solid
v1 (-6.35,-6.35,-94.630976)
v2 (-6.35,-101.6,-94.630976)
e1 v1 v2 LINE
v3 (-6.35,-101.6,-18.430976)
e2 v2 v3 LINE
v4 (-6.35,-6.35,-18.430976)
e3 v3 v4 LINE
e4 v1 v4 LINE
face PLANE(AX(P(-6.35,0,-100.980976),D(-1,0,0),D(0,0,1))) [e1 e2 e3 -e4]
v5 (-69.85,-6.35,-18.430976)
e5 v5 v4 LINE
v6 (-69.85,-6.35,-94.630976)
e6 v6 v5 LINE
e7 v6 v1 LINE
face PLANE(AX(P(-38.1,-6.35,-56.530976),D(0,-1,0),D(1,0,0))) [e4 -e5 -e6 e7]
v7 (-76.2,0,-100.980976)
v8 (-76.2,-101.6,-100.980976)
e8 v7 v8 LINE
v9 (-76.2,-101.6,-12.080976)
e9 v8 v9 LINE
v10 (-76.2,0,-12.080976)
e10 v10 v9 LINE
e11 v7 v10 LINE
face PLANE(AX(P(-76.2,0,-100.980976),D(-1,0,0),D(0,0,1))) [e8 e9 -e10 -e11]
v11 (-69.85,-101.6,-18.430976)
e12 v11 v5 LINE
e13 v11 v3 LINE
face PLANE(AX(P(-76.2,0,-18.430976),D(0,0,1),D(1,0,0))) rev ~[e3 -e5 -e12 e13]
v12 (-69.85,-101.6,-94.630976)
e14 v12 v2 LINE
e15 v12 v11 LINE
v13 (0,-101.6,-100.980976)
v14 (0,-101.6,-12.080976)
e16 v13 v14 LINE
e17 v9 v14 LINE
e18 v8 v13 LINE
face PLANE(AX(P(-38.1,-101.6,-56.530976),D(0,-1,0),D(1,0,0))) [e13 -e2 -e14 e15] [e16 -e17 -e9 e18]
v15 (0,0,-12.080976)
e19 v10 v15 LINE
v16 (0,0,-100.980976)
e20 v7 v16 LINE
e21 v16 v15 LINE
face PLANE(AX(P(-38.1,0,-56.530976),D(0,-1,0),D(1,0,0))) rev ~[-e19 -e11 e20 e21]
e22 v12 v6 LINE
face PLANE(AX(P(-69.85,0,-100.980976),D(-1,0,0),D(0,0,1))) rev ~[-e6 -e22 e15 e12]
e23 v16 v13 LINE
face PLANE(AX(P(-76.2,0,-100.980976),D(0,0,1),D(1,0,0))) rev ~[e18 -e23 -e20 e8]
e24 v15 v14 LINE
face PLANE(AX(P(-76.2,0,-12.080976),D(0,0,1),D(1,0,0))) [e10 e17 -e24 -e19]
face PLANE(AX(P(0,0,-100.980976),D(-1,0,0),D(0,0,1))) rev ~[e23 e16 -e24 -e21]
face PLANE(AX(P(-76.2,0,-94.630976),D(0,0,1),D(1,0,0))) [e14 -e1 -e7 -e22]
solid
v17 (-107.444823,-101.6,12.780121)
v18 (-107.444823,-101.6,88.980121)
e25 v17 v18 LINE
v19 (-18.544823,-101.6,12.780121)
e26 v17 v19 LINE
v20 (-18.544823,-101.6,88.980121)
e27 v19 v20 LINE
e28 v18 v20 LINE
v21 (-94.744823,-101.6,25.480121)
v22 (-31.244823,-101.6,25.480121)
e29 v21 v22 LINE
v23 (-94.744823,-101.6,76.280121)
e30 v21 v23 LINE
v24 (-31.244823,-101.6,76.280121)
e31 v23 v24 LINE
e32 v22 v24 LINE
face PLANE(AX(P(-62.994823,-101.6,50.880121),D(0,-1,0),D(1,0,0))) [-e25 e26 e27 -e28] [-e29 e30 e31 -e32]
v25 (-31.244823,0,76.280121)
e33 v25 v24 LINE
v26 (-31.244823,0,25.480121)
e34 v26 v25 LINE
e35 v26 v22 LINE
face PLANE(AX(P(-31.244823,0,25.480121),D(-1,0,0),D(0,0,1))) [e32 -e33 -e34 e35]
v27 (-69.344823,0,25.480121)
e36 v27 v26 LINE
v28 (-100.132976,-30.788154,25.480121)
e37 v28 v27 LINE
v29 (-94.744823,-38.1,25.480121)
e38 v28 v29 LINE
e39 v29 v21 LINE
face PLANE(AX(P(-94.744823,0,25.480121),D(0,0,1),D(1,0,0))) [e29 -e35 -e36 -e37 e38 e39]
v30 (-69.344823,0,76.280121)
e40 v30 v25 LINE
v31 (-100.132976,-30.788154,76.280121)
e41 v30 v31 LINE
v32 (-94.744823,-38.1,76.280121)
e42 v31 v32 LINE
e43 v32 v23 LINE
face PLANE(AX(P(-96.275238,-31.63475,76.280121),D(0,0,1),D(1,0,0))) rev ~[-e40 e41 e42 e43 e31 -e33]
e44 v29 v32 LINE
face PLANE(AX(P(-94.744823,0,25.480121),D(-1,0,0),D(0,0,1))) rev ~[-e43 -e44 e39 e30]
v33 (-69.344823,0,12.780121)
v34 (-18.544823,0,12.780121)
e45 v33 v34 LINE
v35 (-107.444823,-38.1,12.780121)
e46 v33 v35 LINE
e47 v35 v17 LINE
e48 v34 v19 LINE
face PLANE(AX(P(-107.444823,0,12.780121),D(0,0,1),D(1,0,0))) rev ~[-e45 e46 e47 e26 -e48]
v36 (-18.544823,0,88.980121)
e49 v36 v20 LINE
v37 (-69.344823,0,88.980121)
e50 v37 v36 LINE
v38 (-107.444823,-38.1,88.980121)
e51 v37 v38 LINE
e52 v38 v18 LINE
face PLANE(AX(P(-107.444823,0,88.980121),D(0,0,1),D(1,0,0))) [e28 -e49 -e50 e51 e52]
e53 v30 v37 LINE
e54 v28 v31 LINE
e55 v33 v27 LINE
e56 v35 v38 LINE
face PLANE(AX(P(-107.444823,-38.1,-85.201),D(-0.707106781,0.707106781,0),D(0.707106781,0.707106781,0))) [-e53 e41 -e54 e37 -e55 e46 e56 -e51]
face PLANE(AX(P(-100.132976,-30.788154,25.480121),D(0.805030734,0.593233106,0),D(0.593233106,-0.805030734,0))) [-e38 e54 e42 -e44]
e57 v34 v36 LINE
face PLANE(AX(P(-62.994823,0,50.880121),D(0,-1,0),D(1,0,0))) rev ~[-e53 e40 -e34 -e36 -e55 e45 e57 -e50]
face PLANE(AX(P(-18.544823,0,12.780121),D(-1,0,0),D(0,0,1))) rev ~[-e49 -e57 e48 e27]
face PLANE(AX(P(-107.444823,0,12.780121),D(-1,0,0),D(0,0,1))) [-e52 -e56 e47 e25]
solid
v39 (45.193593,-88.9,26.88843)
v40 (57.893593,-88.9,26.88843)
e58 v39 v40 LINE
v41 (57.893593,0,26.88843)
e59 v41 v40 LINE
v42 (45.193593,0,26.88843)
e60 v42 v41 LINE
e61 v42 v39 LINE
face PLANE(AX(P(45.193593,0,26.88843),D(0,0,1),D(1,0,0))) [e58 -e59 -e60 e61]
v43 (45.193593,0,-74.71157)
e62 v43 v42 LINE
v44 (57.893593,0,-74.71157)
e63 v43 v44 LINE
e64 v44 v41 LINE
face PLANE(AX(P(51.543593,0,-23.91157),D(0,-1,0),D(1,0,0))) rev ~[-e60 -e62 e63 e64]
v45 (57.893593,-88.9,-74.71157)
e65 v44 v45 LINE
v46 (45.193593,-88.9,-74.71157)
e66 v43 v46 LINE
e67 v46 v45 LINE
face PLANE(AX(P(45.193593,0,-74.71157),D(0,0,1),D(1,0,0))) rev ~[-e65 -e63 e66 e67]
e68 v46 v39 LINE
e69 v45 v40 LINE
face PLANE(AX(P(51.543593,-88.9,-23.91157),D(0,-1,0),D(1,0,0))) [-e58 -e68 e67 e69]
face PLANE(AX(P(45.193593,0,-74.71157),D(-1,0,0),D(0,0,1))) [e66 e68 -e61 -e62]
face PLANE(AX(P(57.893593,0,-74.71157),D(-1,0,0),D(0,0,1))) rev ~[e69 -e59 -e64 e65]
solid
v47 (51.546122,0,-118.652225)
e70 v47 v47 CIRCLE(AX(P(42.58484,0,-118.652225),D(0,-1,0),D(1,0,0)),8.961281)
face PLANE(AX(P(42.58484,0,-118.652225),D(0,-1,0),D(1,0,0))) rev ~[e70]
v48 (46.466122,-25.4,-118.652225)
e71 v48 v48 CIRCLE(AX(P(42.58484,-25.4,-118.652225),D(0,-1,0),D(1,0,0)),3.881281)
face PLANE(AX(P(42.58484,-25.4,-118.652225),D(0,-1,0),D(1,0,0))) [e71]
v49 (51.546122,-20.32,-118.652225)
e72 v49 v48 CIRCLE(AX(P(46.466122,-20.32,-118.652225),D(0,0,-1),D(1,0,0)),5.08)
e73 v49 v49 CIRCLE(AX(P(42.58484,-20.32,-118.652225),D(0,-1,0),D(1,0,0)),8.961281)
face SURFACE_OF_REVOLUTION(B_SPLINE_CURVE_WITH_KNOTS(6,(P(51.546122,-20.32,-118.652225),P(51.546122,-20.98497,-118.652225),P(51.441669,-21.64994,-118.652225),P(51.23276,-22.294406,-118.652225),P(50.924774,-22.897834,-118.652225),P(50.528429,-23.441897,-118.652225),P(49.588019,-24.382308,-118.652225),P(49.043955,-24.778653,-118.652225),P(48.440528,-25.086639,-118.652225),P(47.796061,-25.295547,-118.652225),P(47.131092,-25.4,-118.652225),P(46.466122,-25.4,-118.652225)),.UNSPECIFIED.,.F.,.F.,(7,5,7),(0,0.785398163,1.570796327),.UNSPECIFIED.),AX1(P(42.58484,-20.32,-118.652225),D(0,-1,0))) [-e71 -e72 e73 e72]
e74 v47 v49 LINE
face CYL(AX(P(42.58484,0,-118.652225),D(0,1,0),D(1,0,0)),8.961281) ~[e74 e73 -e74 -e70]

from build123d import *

# Parameters (mm, degrees)
F0_W        = 12.7
F0_H        = 101.6
F1_DEPTH    = 88.9
F0_W_2      = 88.9
F0_H_2      = 76.2
F0_W_3      = 63.5
F0_H_3      = 50.8
F2_DEPTH    = 101.6
F3_T1_DEPTH = 272.162243683
F4_T1_DEPTH = 50.8
F5_W        = 76.2
F5_H        = 88.9
F6_DEPTH    = 101.6
F7_T        = -6.35
F8_R        = 8.961281468
F9_DEPTH    = 25.4
F10_R       = 5.08


# Not quite as in the source:
# - a fillet or chamfer that OpenCascade refuses, or shapes differently, is made with other operations: its cross-section is extruded or revolved along the edge and cut away or added


with BuildPart() as f1:
    # F0 (on Front) → F1 (new body)
    with BuildSketch(Plane.XZ):
        with Locations((51.5435934067, -23.9115703218)):
            Rectangle(F0_W, F0_H)
    extrude(amount=F1_DEPTH)


with BuildPart() as f2:
    # F0 (on Front) → F2 (new body)
    with BuildSketch(Plane.XZ):
        with Locations((-62.9948227882, 50.8801213741)):
            Rectangle(F0_W_2, F0_H_2)
        with Locations((-62.9948227882, 50.8801213741)):
            Rectangle(F0_W_3, F0_H_3, mode=Mode.SUBTRACT)
    extrude(amount=F2_DEPTH)

    # F3: chamfer of 38.1 on 1 edges, made by hand

    # F3_s2 → F3_t1 (cut)
    with BuildSketch(Plane.XY.offset(-85.2010004674)):
        Polygon((-107.4448227882, -38.1), (-69.3448227882, 0), (-107.4448227882, 0), align=None)
    extrude(amount=F3_T1_DEPTH, mode=Mode.SUBTRACT)

    # F4: chamfer of 12.7 x 7.62 on 1 edges, made by hand

    # F4_s2 → F4_t1 (cut)
    with BuildSketch(Plane.XY.offset(25.4801213741)):
        Polygon((-100.1329764609, -30.7881536727), (-94.7448227882, -38.1), (-94.7448227882, -25.4), align=None)
    extrude(amount=F4_T1_DEPTH, mode=Mode.SUBTRACT)


with BuildPart() as f6:
    # F5 (on Front) → F6 (new body)
    with BuildSketch(Plane.XZ):
        with Locations((-38.1, -56.5309760347)):
            Rectangle(F5_W, F5_H)
    extrude(amount=F6_DEPTH)

    # F7
    f7_openings = [f6.faces().sort_by_distance(p)[0] for p in [
        (-38.1, -101.6, -56.530976),
    ]]
    offset(amount=F7_T, openings=f7_openings)


with BuildPart() as f9:
    # F8 (on Front) → F9 (new body)
    with BuildSketch(Plane.XZ):
        with Locations((42.5848402083, -118.6522245407)):
            Circle(F8_R)
    extrude(amount=F9_DEPTH)

    # F10
    f10_edges = [f9.edges().sort_by_distance(p)[0] for p in [
        (33.623559, -25.4, -118.652225),
    ]]
    fillet(f10_edges, radius=F10_R)


solid = Compound([f1.part, f2.part, f6.part, f9.part])
